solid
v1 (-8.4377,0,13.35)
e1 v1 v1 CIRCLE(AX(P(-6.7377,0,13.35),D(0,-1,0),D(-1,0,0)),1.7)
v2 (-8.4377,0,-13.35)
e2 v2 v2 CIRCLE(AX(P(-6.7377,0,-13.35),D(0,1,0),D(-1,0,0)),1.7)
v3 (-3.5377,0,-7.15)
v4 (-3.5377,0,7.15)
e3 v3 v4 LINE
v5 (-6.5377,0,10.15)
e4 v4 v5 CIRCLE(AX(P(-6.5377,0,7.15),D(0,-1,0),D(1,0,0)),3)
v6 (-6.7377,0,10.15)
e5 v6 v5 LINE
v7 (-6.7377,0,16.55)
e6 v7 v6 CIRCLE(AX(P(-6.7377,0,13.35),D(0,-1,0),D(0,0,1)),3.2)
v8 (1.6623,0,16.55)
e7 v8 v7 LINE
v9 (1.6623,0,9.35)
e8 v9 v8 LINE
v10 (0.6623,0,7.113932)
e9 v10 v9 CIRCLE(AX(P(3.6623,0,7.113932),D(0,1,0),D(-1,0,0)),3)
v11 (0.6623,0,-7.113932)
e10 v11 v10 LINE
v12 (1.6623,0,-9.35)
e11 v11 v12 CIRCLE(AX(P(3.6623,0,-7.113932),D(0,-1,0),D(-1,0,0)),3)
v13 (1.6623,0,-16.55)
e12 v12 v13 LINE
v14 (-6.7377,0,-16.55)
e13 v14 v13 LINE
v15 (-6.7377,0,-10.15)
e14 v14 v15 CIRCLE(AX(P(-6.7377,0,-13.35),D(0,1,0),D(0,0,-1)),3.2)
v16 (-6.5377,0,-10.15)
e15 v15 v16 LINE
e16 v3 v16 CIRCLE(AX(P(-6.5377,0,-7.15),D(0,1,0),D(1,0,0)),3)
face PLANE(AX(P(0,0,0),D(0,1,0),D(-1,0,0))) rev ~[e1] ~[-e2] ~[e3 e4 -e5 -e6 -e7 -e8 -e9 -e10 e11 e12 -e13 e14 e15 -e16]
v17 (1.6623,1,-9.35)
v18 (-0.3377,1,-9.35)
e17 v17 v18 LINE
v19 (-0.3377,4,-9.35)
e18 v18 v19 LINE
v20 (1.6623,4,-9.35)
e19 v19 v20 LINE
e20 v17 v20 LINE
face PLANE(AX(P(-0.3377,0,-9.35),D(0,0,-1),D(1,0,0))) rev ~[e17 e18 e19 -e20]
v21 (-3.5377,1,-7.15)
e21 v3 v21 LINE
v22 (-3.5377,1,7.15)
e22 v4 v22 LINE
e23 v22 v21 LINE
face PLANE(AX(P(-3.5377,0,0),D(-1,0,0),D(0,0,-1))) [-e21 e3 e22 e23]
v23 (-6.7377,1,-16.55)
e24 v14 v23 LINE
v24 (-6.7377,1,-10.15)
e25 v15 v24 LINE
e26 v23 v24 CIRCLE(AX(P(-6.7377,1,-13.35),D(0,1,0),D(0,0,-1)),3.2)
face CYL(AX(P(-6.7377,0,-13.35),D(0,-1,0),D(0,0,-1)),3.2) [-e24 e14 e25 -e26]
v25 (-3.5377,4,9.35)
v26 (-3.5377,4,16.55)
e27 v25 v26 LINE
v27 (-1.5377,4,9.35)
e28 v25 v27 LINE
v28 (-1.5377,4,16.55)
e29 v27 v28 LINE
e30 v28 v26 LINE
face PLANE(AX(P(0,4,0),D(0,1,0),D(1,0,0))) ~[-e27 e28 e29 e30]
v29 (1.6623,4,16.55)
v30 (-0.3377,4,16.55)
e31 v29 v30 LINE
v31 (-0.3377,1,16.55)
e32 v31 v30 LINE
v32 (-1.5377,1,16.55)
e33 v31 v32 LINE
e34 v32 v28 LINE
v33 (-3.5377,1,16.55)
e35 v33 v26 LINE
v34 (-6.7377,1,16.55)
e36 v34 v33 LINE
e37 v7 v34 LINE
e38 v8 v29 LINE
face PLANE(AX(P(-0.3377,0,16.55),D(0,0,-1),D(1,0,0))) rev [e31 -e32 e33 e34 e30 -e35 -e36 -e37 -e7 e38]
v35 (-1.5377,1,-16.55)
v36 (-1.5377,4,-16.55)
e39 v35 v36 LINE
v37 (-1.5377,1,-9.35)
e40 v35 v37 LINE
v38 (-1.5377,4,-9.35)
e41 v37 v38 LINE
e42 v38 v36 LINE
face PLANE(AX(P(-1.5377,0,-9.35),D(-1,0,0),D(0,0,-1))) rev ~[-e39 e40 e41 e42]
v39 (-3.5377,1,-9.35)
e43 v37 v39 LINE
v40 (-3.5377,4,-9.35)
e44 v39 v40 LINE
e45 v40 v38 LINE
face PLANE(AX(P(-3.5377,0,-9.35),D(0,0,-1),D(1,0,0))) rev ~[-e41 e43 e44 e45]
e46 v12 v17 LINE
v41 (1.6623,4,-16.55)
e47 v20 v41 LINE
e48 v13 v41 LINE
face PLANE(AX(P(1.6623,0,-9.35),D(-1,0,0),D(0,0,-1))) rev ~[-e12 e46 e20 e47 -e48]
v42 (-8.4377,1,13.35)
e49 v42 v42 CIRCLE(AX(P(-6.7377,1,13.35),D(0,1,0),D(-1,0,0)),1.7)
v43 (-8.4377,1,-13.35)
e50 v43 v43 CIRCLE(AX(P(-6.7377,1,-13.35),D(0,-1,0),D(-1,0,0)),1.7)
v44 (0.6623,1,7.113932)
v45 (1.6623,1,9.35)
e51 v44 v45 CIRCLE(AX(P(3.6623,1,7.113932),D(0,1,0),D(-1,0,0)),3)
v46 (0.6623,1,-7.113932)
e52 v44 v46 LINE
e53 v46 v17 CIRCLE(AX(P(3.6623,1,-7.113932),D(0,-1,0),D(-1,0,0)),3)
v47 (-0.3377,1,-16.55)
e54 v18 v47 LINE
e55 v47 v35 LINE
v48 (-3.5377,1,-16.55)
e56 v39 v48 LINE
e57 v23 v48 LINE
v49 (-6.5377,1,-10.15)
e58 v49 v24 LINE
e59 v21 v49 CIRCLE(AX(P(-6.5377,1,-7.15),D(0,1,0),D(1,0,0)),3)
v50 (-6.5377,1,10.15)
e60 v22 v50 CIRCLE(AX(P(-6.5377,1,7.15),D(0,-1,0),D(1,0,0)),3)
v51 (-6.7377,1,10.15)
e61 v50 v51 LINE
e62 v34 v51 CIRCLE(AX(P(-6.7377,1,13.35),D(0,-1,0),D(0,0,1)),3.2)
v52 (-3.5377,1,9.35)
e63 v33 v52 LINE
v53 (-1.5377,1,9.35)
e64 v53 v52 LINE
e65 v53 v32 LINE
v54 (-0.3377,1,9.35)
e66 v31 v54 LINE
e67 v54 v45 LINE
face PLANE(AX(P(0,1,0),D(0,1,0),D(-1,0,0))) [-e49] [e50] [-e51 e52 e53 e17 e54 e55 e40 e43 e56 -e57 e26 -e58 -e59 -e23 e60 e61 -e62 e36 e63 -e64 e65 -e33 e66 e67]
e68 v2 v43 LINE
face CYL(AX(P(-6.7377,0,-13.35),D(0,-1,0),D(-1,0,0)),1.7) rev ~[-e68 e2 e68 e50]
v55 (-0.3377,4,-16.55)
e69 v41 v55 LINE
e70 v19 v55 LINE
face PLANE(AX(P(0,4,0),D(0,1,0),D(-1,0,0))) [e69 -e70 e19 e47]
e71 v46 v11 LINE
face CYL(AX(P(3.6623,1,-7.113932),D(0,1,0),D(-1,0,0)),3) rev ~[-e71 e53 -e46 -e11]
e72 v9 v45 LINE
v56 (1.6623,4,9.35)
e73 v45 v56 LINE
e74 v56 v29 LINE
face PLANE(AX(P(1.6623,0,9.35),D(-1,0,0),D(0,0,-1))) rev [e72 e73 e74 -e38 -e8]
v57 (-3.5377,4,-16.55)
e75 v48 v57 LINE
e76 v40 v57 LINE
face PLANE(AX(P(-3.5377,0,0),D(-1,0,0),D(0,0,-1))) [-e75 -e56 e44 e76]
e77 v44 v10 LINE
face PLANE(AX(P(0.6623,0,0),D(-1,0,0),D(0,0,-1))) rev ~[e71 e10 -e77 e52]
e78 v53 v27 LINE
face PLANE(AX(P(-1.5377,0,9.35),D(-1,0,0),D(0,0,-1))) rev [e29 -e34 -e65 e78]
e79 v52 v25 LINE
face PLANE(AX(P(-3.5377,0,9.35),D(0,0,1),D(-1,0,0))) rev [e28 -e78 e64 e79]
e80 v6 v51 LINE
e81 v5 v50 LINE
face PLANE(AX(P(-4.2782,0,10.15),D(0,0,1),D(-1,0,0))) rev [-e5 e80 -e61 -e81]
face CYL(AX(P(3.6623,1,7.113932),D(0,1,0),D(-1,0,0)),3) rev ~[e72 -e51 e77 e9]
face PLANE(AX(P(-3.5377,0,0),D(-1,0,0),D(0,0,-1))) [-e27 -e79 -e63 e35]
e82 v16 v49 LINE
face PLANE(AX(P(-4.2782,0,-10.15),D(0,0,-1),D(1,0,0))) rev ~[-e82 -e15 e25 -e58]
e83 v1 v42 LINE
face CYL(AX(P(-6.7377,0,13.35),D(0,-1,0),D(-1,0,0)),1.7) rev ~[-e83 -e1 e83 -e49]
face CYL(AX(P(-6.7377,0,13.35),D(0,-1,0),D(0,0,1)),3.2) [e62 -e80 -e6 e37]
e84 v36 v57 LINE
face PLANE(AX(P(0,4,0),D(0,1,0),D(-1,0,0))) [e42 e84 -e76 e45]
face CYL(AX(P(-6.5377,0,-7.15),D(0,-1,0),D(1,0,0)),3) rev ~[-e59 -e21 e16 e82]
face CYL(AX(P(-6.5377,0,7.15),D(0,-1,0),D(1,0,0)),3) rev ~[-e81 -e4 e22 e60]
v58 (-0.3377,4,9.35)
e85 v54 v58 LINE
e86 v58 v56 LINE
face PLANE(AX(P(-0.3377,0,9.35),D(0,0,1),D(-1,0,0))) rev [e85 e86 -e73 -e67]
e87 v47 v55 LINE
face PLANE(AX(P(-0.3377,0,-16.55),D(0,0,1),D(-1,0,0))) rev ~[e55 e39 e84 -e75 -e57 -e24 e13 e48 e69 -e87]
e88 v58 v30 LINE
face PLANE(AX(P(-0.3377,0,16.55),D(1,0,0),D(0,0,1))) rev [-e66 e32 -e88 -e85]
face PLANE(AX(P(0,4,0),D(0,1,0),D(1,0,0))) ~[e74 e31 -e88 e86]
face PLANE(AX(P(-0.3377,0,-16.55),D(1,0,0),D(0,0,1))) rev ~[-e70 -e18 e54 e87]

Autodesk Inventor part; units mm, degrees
ref_plane "YZ Plane" through (0, 0, 0) normal (1, 0, 0) x (0, 1, 0)
ref_plane "XZ Plane" through (0, 0, 0) normal (0, 1, 0) x (-1, 0, 0)
ref_plane "XY Plane" through (0, 0, 0) normal (0, 0, 1) x (1, 0, 0)
sketch "Náčrt1" plane through (0, 0, 0) normal (0, 1, 0) x (-1, 0, 0)
  line L0 (0, 0) -> (7.0755, 0)
  line L1 (6.7377, 13.35) -> (6.7377, -13.35)
  line L2 (4.2782, 13.5) -> (4.2782, -13.5)
  line L3 (3.5377, 9.35) -> (3.5377, -9.35)
  circle A0 centre (6.7377, -13.35) radius 1.7
  line L4 (3.5377, -9.35) -> (1.5377, -9.35)
  line L5 (1.5377, -9.35) -> (1.5377, -16.55)
  line L6 (1.5377, -16.55) -> (3.5377, -16.55)
  line L7 (3.5377, -16.55) -> (3.5377, -9.35)
  arc A1 (6.7377, -16.55) -> (6.7377, -10.15) centre (6.7377, -13.35) ccw
  line L8 (6.7377, -10.15) -> (3.5377, -10.15)
  line L9 (6.7377, -16.55) -> (1.5377, -16.55)
  line L10 (0.3377, -9.35) -> (-1.6623, -9.35)
  line L11 (-1.6623, -9.35) -> (-1.6623, -16.55)
  line L12 (-1.6623, -16.55) -> (0.3377, -16.55)
  line L13 (0.3377, -16.55) -> (0.3377, -9.35)
  line L14 (-1.6623, -16.55) -> (-1.6623, -16.55)
  line L15 (-1.6623, -16.55) -> (1.5377, -16.55)
  line L16 (1.5377, -9.35) -> (0.3377, -9.35)
  line L17 (-0.6623, -10.15) -> (3.5377, -10.15)
  line L18 (3.5377, -10.15) -> (3.5377, 0)
  line L19 (3.5377, 0) -> (-0.6623, 0)
  line L20 (-0.6623, 0) -> (-0.6623, -10.15)
  point P0 (2.5377, 0)
  point P1 (3.5377, -10.15)
  point P2 (2.5377, -9.35)
  point P3 (1.5377, -10.15)
  point P4 (3.5377, -9.35)
  point P5 (-0.6623, -9.35)
  point P6 (3.5377, 0)
  point P7 (3.5377, 0)
  dimension "d0" = 26.7
  dimension "d1" = 27
  dimension "d2" = 18.7
  dimension "d4" = 3.4
  dimension "d5" = 2
  dimension "d7" = 1.5
  dimension "d9" = 2
  dimension "d11" = 1.2
  dimension "d19" = 1
extrude "Vysunutí1" add sketch "Náčrt1" along normal blind 1 contours L0 L3 L4 L16 L10 L20 L19 | L7 L17 L5 L4 | L10 L13 L17 L20 | L8 A1 L9 L7 | L5 L17 L13 L16 | L5 L15 L13 L17
extrude "Vysunutí2" add sketch "Náčrt1" along normal blind 4 contours L7 L17 L5 L4 | L20 L17 L13 L12 L11 L10 | L10 L13 L17 L20 | L7 L6 L5 L17
fillet "Zaoblení1" radius 3 1 edges at (0.6623, 0.5, -9.35)
fillet "Zaoblení4" radius 3 1 edges at (-3.5377, 0.5, -10.15)
mirror "Zrcadlit2" about plane through (-3.5377, 0, 0) normal (0, 0, 1) of "Vysunutí1", "Vysunutí2", "Zaoblení1", "Zaoblení4"
properties part number "esp holder"
